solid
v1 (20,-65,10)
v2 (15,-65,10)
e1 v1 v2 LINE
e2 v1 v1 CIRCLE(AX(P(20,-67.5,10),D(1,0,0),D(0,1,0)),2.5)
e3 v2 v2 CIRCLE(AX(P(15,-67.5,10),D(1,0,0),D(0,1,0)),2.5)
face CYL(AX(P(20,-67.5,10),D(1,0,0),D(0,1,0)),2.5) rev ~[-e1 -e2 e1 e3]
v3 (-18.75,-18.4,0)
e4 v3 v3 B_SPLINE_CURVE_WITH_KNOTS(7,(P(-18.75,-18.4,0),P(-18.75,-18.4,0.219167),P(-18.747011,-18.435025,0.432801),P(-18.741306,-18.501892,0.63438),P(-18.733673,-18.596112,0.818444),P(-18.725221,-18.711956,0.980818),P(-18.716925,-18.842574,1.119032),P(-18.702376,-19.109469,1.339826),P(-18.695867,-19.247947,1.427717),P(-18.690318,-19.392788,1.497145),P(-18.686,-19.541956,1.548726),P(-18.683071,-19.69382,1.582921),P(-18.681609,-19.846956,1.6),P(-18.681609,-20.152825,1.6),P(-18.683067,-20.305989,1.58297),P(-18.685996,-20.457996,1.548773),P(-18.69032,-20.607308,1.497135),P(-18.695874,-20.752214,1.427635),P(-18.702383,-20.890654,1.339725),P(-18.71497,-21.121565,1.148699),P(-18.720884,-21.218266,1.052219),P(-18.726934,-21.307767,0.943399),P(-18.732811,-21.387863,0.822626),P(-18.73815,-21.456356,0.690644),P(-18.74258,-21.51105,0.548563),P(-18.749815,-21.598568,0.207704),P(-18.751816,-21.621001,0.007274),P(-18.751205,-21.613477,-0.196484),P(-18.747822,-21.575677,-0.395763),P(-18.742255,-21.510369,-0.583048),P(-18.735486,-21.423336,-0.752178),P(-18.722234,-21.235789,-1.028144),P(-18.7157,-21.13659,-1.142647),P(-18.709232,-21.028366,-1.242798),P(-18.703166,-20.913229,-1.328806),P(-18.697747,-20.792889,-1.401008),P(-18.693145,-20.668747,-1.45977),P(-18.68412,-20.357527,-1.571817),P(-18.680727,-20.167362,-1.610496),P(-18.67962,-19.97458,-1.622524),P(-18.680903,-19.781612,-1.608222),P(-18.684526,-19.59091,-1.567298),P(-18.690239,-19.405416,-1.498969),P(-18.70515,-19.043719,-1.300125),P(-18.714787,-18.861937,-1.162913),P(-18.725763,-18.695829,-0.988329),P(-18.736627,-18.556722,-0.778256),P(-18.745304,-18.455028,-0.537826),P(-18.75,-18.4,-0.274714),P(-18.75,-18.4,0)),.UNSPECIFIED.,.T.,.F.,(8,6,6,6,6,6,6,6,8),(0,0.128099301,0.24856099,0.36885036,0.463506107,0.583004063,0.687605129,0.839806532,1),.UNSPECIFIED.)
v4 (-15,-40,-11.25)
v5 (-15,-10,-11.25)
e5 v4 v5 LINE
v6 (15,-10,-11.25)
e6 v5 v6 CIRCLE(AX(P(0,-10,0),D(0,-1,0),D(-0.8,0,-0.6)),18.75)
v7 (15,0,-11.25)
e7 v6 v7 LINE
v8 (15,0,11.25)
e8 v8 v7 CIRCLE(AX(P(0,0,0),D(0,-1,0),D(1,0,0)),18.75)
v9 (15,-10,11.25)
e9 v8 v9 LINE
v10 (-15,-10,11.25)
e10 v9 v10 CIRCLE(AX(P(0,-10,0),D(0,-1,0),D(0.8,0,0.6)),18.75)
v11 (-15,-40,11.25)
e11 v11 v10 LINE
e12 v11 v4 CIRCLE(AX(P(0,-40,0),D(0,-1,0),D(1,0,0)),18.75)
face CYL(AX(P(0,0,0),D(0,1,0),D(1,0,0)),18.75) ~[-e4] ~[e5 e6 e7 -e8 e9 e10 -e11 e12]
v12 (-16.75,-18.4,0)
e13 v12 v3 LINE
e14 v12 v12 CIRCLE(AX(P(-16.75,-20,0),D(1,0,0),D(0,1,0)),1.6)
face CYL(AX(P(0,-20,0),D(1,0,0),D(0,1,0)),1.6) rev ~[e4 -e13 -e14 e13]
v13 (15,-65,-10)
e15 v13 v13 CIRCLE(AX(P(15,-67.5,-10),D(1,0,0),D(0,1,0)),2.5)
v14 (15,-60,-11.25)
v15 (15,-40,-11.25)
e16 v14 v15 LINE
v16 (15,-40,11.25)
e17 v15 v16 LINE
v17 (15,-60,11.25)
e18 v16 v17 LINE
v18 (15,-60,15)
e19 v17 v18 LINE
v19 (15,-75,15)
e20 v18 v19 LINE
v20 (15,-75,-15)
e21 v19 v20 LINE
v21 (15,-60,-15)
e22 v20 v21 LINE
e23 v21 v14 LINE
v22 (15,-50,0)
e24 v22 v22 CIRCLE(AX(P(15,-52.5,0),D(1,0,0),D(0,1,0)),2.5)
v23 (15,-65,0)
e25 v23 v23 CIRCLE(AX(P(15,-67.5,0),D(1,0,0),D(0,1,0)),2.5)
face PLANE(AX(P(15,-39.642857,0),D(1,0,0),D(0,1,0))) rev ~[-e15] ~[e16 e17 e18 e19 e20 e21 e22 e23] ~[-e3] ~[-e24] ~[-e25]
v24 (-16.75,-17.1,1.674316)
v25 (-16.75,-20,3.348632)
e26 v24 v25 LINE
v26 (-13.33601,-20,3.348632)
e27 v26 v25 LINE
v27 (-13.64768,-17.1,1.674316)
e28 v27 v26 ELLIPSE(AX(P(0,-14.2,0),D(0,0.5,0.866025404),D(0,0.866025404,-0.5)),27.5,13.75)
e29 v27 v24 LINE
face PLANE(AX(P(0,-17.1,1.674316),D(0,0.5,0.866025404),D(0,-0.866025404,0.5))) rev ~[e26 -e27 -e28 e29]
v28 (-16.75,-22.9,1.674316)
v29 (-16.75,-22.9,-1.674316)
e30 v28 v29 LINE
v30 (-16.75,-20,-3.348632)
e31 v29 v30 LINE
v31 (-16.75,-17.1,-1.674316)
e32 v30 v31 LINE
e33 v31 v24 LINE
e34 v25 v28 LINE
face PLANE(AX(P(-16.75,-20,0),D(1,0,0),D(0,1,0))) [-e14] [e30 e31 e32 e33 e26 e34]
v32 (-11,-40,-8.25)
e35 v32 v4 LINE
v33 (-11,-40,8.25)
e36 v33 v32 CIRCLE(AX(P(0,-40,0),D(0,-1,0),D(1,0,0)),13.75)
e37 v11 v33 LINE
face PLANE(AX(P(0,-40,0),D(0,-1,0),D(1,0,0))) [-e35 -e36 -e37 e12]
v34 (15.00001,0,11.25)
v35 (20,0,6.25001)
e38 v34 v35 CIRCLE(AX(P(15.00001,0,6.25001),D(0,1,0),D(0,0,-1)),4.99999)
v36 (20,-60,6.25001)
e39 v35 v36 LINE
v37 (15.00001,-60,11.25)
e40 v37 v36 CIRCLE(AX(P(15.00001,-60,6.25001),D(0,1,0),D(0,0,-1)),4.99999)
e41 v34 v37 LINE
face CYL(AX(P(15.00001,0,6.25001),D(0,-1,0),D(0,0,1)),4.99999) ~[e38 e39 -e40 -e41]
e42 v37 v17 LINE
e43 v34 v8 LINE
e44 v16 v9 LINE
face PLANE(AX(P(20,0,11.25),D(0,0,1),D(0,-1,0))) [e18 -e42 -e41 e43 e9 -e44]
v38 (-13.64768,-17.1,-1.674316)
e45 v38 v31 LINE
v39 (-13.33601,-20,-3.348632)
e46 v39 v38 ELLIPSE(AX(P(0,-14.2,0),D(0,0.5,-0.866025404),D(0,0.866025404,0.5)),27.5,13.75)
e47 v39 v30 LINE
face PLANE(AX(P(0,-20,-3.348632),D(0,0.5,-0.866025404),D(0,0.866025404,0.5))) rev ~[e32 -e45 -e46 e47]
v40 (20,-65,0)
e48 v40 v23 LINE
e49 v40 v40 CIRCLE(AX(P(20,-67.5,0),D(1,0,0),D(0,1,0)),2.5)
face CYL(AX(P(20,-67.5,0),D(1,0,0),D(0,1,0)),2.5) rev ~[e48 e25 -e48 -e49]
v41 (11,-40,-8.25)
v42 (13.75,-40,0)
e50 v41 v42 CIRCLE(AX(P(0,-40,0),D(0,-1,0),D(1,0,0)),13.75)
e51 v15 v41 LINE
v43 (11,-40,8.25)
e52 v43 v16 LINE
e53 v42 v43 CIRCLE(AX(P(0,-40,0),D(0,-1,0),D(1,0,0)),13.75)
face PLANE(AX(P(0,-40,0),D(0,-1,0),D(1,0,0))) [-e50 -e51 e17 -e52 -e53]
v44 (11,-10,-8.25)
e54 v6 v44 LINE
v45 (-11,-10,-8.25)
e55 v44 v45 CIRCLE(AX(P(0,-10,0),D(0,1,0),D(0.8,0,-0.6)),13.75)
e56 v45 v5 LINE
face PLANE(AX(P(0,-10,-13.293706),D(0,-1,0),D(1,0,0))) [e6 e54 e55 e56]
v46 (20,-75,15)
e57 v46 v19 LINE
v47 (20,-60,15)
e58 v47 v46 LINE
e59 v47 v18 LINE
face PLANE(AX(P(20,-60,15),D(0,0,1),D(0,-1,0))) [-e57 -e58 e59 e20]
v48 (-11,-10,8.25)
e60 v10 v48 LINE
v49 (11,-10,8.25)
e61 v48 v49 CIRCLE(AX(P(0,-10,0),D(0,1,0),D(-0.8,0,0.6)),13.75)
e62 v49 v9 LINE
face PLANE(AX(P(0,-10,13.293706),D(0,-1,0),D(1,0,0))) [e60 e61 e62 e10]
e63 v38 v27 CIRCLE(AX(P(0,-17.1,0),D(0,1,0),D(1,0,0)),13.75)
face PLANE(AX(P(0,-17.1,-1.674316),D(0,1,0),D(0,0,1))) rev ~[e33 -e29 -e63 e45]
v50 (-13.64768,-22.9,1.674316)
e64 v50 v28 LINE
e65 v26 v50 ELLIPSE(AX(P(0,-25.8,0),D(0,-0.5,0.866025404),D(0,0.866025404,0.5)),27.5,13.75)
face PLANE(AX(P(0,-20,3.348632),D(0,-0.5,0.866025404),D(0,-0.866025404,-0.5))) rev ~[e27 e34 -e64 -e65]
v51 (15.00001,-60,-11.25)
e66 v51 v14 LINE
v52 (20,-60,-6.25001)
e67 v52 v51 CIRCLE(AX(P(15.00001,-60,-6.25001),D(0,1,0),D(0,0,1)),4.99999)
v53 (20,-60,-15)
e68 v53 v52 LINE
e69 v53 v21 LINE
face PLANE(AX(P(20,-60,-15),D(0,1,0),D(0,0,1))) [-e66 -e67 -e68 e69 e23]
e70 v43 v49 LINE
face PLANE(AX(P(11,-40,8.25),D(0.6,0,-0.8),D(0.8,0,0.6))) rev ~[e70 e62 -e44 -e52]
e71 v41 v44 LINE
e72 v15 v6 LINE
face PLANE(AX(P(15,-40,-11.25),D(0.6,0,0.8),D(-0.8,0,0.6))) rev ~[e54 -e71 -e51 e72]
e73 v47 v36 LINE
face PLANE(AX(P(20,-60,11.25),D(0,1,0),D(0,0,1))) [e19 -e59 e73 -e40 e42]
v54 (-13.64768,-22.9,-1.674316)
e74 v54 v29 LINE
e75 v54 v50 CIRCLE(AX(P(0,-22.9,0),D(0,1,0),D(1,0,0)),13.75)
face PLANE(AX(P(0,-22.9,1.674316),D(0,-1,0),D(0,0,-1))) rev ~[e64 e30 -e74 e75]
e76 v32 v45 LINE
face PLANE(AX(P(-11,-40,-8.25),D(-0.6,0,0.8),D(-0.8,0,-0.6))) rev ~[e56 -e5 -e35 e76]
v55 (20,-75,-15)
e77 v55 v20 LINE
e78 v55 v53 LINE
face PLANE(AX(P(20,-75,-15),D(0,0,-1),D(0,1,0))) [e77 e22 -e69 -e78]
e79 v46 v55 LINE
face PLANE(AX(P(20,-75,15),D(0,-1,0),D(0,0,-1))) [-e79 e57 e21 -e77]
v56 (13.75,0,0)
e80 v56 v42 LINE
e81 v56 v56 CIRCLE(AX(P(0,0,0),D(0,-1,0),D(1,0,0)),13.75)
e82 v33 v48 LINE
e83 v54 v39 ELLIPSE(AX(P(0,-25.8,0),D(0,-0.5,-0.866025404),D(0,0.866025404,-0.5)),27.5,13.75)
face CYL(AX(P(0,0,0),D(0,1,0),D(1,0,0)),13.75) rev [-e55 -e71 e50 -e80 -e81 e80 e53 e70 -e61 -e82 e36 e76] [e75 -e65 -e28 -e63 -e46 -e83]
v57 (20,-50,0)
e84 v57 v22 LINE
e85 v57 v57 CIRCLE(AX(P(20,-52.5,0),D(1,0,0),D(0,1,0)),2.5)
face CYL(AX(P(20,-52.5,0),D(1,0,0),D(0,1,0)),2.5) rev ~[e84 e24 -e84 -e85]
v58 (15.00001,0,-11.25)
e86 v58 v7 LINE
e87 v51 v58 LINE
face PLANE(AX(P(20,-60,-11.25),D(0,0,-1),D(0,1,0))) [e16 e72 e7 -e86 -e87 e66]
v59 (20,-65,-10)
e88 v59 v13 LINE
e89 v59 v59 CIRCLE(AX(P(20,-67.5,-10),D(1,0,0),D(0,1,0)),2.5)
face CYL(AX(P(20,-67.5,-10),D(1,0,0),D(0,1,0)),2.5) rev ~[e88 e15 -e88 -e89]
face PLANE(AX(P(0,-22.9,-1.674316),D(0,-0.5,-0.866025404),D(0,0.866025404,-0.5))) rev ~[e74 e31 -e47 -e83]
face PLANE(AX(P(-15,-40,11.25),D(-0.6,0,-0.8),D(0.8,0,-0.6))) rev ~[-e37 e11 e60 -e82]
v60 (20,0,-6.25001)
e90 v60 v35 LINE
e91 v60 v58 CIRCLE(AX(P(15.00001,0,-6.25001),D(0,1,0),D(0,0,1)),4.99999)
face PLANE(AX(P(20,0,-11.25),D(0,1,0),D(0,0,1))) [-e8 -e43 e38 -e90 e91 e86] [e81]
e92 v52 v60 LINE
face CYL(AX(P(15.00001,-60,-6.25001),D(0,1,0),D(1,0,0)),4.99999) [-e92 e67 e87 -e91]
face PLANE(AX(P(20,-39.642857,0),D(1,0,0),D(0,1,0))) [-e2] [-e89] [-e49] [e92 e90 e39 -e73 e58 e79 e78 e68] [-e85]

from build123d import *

# Parameters (mm, degrees)
F0_R     = 18.75
F0_R_2   = 13.75
F1_DEPTH = 40
F3_DEPTH = 30
F4_R     = 1.6
F5_DEPTH = 19.750000113
F6_DEPTH = 16.75
F8_R     = 2.5
F9_DEPTH = 5
F10_R    = 4.99999


# Not quite as in the source:
# - a fillet or chamfer is up to 0.001 mm smaller than in the source, because OpenCascade refuses the exact size


with BuildPart() as f1:
    # F0 (on Front) → F1 (new body)
    with BuildSketch(Plane.XZ):
        Circle(F0_R)
        Circle(F0_R_2, mode=Mode.SUBTRACT)
    extrude(amount=F1_DEPTH)

    # F2 (on face) → F3 (cut)
    with BuildSketch(Plane.XZ.offset(40)):
        with BuildLine():
            ThreePointArc((-11, 8.25), (0, 13.75), (11, 8.25))
            Line((11, 8.25), (15, 11.25))
            ThreePointArc((15, 11.25), (0, 18.75), (-15, 11.25))
            Line((-15, 11.25), (-11, 8.25))
        make_face()
        with BuildLine():
            Line((15, -11.25), (11, -8.25))
            ThreePointArc((11, -8.25), (0, -13.75), (-11, -8.25))
            Line((-11, -8.25), (-15, -11.25))
            ThreePointArc((-15, -11.25), (0, -18.75), (15, -11.25))
        make_face()
    extrude(amount=-F3_DEPTH, mode=Mode.SUBTRACT)

    # F4 (on Right) → F5 (cut, up to face)
    with BuildSketch(Plane.YZ):
        with Locations((-20, 0)):
            Circle(F4_R)
    extrude(amount=-F5_DEPTH, mode=Mode.SUBTRACT)

    # F4 (on Right) → F6 (cut)
    with BuildSketch(Plane.YZ):
        Polygon((-22.9, 1.6743157806), (-22.9, -1.6743157806), (-20, -3.3486315613), (-17.1, -1.6743157806), (-17.1, 1.6743157806), (-20, 3.3486315613), align=None)
        with Locations((-20, 0)):
            Circle(F4_R, mode=Mode.SUBTRACT)
    extrude(amount=-F6_DEPTH, mode=Mode.SUBTRACT)

    # F8 (on offset) → F9 (join)
    with BuildSketch(Plane.YZ.offset(20)):
        Polygon((0, 11.25), (-60, 11.25), (-60, 15), (-75, 15), (-75, -15), (-60, -15), (-60, -11.25), (0, -11.25), align=None)
        with Locations((-67.5, -10)):
            Circle(F8_R, mode=Mode.SUBTRACT)
        with Locations((-67.5, 0)):
            Circle(F8_R, mode=Mode.SUBTRACT)
        with Locations((-52.5, 0)):
            Circle(F8_R, mode=Mode.SUBTRACT)
        with Locations((-67.5, 10)):
            Circle(F8_R, mode=Mode.SUBTRACT)
    extrude(amount=-F9_DEPTH)

    # F10 (radius 5 in the source; OpenCascade refuses exactly that, so slightly less here)
    f10_edges = [f1.edges().sort_by_distance(p)[0] for p in [
        (20, -30, 11.25),
        (20, -30, -11.25),
    ]]
    fillet(f10_edges, radius=F10_R)


solid = f1.part
